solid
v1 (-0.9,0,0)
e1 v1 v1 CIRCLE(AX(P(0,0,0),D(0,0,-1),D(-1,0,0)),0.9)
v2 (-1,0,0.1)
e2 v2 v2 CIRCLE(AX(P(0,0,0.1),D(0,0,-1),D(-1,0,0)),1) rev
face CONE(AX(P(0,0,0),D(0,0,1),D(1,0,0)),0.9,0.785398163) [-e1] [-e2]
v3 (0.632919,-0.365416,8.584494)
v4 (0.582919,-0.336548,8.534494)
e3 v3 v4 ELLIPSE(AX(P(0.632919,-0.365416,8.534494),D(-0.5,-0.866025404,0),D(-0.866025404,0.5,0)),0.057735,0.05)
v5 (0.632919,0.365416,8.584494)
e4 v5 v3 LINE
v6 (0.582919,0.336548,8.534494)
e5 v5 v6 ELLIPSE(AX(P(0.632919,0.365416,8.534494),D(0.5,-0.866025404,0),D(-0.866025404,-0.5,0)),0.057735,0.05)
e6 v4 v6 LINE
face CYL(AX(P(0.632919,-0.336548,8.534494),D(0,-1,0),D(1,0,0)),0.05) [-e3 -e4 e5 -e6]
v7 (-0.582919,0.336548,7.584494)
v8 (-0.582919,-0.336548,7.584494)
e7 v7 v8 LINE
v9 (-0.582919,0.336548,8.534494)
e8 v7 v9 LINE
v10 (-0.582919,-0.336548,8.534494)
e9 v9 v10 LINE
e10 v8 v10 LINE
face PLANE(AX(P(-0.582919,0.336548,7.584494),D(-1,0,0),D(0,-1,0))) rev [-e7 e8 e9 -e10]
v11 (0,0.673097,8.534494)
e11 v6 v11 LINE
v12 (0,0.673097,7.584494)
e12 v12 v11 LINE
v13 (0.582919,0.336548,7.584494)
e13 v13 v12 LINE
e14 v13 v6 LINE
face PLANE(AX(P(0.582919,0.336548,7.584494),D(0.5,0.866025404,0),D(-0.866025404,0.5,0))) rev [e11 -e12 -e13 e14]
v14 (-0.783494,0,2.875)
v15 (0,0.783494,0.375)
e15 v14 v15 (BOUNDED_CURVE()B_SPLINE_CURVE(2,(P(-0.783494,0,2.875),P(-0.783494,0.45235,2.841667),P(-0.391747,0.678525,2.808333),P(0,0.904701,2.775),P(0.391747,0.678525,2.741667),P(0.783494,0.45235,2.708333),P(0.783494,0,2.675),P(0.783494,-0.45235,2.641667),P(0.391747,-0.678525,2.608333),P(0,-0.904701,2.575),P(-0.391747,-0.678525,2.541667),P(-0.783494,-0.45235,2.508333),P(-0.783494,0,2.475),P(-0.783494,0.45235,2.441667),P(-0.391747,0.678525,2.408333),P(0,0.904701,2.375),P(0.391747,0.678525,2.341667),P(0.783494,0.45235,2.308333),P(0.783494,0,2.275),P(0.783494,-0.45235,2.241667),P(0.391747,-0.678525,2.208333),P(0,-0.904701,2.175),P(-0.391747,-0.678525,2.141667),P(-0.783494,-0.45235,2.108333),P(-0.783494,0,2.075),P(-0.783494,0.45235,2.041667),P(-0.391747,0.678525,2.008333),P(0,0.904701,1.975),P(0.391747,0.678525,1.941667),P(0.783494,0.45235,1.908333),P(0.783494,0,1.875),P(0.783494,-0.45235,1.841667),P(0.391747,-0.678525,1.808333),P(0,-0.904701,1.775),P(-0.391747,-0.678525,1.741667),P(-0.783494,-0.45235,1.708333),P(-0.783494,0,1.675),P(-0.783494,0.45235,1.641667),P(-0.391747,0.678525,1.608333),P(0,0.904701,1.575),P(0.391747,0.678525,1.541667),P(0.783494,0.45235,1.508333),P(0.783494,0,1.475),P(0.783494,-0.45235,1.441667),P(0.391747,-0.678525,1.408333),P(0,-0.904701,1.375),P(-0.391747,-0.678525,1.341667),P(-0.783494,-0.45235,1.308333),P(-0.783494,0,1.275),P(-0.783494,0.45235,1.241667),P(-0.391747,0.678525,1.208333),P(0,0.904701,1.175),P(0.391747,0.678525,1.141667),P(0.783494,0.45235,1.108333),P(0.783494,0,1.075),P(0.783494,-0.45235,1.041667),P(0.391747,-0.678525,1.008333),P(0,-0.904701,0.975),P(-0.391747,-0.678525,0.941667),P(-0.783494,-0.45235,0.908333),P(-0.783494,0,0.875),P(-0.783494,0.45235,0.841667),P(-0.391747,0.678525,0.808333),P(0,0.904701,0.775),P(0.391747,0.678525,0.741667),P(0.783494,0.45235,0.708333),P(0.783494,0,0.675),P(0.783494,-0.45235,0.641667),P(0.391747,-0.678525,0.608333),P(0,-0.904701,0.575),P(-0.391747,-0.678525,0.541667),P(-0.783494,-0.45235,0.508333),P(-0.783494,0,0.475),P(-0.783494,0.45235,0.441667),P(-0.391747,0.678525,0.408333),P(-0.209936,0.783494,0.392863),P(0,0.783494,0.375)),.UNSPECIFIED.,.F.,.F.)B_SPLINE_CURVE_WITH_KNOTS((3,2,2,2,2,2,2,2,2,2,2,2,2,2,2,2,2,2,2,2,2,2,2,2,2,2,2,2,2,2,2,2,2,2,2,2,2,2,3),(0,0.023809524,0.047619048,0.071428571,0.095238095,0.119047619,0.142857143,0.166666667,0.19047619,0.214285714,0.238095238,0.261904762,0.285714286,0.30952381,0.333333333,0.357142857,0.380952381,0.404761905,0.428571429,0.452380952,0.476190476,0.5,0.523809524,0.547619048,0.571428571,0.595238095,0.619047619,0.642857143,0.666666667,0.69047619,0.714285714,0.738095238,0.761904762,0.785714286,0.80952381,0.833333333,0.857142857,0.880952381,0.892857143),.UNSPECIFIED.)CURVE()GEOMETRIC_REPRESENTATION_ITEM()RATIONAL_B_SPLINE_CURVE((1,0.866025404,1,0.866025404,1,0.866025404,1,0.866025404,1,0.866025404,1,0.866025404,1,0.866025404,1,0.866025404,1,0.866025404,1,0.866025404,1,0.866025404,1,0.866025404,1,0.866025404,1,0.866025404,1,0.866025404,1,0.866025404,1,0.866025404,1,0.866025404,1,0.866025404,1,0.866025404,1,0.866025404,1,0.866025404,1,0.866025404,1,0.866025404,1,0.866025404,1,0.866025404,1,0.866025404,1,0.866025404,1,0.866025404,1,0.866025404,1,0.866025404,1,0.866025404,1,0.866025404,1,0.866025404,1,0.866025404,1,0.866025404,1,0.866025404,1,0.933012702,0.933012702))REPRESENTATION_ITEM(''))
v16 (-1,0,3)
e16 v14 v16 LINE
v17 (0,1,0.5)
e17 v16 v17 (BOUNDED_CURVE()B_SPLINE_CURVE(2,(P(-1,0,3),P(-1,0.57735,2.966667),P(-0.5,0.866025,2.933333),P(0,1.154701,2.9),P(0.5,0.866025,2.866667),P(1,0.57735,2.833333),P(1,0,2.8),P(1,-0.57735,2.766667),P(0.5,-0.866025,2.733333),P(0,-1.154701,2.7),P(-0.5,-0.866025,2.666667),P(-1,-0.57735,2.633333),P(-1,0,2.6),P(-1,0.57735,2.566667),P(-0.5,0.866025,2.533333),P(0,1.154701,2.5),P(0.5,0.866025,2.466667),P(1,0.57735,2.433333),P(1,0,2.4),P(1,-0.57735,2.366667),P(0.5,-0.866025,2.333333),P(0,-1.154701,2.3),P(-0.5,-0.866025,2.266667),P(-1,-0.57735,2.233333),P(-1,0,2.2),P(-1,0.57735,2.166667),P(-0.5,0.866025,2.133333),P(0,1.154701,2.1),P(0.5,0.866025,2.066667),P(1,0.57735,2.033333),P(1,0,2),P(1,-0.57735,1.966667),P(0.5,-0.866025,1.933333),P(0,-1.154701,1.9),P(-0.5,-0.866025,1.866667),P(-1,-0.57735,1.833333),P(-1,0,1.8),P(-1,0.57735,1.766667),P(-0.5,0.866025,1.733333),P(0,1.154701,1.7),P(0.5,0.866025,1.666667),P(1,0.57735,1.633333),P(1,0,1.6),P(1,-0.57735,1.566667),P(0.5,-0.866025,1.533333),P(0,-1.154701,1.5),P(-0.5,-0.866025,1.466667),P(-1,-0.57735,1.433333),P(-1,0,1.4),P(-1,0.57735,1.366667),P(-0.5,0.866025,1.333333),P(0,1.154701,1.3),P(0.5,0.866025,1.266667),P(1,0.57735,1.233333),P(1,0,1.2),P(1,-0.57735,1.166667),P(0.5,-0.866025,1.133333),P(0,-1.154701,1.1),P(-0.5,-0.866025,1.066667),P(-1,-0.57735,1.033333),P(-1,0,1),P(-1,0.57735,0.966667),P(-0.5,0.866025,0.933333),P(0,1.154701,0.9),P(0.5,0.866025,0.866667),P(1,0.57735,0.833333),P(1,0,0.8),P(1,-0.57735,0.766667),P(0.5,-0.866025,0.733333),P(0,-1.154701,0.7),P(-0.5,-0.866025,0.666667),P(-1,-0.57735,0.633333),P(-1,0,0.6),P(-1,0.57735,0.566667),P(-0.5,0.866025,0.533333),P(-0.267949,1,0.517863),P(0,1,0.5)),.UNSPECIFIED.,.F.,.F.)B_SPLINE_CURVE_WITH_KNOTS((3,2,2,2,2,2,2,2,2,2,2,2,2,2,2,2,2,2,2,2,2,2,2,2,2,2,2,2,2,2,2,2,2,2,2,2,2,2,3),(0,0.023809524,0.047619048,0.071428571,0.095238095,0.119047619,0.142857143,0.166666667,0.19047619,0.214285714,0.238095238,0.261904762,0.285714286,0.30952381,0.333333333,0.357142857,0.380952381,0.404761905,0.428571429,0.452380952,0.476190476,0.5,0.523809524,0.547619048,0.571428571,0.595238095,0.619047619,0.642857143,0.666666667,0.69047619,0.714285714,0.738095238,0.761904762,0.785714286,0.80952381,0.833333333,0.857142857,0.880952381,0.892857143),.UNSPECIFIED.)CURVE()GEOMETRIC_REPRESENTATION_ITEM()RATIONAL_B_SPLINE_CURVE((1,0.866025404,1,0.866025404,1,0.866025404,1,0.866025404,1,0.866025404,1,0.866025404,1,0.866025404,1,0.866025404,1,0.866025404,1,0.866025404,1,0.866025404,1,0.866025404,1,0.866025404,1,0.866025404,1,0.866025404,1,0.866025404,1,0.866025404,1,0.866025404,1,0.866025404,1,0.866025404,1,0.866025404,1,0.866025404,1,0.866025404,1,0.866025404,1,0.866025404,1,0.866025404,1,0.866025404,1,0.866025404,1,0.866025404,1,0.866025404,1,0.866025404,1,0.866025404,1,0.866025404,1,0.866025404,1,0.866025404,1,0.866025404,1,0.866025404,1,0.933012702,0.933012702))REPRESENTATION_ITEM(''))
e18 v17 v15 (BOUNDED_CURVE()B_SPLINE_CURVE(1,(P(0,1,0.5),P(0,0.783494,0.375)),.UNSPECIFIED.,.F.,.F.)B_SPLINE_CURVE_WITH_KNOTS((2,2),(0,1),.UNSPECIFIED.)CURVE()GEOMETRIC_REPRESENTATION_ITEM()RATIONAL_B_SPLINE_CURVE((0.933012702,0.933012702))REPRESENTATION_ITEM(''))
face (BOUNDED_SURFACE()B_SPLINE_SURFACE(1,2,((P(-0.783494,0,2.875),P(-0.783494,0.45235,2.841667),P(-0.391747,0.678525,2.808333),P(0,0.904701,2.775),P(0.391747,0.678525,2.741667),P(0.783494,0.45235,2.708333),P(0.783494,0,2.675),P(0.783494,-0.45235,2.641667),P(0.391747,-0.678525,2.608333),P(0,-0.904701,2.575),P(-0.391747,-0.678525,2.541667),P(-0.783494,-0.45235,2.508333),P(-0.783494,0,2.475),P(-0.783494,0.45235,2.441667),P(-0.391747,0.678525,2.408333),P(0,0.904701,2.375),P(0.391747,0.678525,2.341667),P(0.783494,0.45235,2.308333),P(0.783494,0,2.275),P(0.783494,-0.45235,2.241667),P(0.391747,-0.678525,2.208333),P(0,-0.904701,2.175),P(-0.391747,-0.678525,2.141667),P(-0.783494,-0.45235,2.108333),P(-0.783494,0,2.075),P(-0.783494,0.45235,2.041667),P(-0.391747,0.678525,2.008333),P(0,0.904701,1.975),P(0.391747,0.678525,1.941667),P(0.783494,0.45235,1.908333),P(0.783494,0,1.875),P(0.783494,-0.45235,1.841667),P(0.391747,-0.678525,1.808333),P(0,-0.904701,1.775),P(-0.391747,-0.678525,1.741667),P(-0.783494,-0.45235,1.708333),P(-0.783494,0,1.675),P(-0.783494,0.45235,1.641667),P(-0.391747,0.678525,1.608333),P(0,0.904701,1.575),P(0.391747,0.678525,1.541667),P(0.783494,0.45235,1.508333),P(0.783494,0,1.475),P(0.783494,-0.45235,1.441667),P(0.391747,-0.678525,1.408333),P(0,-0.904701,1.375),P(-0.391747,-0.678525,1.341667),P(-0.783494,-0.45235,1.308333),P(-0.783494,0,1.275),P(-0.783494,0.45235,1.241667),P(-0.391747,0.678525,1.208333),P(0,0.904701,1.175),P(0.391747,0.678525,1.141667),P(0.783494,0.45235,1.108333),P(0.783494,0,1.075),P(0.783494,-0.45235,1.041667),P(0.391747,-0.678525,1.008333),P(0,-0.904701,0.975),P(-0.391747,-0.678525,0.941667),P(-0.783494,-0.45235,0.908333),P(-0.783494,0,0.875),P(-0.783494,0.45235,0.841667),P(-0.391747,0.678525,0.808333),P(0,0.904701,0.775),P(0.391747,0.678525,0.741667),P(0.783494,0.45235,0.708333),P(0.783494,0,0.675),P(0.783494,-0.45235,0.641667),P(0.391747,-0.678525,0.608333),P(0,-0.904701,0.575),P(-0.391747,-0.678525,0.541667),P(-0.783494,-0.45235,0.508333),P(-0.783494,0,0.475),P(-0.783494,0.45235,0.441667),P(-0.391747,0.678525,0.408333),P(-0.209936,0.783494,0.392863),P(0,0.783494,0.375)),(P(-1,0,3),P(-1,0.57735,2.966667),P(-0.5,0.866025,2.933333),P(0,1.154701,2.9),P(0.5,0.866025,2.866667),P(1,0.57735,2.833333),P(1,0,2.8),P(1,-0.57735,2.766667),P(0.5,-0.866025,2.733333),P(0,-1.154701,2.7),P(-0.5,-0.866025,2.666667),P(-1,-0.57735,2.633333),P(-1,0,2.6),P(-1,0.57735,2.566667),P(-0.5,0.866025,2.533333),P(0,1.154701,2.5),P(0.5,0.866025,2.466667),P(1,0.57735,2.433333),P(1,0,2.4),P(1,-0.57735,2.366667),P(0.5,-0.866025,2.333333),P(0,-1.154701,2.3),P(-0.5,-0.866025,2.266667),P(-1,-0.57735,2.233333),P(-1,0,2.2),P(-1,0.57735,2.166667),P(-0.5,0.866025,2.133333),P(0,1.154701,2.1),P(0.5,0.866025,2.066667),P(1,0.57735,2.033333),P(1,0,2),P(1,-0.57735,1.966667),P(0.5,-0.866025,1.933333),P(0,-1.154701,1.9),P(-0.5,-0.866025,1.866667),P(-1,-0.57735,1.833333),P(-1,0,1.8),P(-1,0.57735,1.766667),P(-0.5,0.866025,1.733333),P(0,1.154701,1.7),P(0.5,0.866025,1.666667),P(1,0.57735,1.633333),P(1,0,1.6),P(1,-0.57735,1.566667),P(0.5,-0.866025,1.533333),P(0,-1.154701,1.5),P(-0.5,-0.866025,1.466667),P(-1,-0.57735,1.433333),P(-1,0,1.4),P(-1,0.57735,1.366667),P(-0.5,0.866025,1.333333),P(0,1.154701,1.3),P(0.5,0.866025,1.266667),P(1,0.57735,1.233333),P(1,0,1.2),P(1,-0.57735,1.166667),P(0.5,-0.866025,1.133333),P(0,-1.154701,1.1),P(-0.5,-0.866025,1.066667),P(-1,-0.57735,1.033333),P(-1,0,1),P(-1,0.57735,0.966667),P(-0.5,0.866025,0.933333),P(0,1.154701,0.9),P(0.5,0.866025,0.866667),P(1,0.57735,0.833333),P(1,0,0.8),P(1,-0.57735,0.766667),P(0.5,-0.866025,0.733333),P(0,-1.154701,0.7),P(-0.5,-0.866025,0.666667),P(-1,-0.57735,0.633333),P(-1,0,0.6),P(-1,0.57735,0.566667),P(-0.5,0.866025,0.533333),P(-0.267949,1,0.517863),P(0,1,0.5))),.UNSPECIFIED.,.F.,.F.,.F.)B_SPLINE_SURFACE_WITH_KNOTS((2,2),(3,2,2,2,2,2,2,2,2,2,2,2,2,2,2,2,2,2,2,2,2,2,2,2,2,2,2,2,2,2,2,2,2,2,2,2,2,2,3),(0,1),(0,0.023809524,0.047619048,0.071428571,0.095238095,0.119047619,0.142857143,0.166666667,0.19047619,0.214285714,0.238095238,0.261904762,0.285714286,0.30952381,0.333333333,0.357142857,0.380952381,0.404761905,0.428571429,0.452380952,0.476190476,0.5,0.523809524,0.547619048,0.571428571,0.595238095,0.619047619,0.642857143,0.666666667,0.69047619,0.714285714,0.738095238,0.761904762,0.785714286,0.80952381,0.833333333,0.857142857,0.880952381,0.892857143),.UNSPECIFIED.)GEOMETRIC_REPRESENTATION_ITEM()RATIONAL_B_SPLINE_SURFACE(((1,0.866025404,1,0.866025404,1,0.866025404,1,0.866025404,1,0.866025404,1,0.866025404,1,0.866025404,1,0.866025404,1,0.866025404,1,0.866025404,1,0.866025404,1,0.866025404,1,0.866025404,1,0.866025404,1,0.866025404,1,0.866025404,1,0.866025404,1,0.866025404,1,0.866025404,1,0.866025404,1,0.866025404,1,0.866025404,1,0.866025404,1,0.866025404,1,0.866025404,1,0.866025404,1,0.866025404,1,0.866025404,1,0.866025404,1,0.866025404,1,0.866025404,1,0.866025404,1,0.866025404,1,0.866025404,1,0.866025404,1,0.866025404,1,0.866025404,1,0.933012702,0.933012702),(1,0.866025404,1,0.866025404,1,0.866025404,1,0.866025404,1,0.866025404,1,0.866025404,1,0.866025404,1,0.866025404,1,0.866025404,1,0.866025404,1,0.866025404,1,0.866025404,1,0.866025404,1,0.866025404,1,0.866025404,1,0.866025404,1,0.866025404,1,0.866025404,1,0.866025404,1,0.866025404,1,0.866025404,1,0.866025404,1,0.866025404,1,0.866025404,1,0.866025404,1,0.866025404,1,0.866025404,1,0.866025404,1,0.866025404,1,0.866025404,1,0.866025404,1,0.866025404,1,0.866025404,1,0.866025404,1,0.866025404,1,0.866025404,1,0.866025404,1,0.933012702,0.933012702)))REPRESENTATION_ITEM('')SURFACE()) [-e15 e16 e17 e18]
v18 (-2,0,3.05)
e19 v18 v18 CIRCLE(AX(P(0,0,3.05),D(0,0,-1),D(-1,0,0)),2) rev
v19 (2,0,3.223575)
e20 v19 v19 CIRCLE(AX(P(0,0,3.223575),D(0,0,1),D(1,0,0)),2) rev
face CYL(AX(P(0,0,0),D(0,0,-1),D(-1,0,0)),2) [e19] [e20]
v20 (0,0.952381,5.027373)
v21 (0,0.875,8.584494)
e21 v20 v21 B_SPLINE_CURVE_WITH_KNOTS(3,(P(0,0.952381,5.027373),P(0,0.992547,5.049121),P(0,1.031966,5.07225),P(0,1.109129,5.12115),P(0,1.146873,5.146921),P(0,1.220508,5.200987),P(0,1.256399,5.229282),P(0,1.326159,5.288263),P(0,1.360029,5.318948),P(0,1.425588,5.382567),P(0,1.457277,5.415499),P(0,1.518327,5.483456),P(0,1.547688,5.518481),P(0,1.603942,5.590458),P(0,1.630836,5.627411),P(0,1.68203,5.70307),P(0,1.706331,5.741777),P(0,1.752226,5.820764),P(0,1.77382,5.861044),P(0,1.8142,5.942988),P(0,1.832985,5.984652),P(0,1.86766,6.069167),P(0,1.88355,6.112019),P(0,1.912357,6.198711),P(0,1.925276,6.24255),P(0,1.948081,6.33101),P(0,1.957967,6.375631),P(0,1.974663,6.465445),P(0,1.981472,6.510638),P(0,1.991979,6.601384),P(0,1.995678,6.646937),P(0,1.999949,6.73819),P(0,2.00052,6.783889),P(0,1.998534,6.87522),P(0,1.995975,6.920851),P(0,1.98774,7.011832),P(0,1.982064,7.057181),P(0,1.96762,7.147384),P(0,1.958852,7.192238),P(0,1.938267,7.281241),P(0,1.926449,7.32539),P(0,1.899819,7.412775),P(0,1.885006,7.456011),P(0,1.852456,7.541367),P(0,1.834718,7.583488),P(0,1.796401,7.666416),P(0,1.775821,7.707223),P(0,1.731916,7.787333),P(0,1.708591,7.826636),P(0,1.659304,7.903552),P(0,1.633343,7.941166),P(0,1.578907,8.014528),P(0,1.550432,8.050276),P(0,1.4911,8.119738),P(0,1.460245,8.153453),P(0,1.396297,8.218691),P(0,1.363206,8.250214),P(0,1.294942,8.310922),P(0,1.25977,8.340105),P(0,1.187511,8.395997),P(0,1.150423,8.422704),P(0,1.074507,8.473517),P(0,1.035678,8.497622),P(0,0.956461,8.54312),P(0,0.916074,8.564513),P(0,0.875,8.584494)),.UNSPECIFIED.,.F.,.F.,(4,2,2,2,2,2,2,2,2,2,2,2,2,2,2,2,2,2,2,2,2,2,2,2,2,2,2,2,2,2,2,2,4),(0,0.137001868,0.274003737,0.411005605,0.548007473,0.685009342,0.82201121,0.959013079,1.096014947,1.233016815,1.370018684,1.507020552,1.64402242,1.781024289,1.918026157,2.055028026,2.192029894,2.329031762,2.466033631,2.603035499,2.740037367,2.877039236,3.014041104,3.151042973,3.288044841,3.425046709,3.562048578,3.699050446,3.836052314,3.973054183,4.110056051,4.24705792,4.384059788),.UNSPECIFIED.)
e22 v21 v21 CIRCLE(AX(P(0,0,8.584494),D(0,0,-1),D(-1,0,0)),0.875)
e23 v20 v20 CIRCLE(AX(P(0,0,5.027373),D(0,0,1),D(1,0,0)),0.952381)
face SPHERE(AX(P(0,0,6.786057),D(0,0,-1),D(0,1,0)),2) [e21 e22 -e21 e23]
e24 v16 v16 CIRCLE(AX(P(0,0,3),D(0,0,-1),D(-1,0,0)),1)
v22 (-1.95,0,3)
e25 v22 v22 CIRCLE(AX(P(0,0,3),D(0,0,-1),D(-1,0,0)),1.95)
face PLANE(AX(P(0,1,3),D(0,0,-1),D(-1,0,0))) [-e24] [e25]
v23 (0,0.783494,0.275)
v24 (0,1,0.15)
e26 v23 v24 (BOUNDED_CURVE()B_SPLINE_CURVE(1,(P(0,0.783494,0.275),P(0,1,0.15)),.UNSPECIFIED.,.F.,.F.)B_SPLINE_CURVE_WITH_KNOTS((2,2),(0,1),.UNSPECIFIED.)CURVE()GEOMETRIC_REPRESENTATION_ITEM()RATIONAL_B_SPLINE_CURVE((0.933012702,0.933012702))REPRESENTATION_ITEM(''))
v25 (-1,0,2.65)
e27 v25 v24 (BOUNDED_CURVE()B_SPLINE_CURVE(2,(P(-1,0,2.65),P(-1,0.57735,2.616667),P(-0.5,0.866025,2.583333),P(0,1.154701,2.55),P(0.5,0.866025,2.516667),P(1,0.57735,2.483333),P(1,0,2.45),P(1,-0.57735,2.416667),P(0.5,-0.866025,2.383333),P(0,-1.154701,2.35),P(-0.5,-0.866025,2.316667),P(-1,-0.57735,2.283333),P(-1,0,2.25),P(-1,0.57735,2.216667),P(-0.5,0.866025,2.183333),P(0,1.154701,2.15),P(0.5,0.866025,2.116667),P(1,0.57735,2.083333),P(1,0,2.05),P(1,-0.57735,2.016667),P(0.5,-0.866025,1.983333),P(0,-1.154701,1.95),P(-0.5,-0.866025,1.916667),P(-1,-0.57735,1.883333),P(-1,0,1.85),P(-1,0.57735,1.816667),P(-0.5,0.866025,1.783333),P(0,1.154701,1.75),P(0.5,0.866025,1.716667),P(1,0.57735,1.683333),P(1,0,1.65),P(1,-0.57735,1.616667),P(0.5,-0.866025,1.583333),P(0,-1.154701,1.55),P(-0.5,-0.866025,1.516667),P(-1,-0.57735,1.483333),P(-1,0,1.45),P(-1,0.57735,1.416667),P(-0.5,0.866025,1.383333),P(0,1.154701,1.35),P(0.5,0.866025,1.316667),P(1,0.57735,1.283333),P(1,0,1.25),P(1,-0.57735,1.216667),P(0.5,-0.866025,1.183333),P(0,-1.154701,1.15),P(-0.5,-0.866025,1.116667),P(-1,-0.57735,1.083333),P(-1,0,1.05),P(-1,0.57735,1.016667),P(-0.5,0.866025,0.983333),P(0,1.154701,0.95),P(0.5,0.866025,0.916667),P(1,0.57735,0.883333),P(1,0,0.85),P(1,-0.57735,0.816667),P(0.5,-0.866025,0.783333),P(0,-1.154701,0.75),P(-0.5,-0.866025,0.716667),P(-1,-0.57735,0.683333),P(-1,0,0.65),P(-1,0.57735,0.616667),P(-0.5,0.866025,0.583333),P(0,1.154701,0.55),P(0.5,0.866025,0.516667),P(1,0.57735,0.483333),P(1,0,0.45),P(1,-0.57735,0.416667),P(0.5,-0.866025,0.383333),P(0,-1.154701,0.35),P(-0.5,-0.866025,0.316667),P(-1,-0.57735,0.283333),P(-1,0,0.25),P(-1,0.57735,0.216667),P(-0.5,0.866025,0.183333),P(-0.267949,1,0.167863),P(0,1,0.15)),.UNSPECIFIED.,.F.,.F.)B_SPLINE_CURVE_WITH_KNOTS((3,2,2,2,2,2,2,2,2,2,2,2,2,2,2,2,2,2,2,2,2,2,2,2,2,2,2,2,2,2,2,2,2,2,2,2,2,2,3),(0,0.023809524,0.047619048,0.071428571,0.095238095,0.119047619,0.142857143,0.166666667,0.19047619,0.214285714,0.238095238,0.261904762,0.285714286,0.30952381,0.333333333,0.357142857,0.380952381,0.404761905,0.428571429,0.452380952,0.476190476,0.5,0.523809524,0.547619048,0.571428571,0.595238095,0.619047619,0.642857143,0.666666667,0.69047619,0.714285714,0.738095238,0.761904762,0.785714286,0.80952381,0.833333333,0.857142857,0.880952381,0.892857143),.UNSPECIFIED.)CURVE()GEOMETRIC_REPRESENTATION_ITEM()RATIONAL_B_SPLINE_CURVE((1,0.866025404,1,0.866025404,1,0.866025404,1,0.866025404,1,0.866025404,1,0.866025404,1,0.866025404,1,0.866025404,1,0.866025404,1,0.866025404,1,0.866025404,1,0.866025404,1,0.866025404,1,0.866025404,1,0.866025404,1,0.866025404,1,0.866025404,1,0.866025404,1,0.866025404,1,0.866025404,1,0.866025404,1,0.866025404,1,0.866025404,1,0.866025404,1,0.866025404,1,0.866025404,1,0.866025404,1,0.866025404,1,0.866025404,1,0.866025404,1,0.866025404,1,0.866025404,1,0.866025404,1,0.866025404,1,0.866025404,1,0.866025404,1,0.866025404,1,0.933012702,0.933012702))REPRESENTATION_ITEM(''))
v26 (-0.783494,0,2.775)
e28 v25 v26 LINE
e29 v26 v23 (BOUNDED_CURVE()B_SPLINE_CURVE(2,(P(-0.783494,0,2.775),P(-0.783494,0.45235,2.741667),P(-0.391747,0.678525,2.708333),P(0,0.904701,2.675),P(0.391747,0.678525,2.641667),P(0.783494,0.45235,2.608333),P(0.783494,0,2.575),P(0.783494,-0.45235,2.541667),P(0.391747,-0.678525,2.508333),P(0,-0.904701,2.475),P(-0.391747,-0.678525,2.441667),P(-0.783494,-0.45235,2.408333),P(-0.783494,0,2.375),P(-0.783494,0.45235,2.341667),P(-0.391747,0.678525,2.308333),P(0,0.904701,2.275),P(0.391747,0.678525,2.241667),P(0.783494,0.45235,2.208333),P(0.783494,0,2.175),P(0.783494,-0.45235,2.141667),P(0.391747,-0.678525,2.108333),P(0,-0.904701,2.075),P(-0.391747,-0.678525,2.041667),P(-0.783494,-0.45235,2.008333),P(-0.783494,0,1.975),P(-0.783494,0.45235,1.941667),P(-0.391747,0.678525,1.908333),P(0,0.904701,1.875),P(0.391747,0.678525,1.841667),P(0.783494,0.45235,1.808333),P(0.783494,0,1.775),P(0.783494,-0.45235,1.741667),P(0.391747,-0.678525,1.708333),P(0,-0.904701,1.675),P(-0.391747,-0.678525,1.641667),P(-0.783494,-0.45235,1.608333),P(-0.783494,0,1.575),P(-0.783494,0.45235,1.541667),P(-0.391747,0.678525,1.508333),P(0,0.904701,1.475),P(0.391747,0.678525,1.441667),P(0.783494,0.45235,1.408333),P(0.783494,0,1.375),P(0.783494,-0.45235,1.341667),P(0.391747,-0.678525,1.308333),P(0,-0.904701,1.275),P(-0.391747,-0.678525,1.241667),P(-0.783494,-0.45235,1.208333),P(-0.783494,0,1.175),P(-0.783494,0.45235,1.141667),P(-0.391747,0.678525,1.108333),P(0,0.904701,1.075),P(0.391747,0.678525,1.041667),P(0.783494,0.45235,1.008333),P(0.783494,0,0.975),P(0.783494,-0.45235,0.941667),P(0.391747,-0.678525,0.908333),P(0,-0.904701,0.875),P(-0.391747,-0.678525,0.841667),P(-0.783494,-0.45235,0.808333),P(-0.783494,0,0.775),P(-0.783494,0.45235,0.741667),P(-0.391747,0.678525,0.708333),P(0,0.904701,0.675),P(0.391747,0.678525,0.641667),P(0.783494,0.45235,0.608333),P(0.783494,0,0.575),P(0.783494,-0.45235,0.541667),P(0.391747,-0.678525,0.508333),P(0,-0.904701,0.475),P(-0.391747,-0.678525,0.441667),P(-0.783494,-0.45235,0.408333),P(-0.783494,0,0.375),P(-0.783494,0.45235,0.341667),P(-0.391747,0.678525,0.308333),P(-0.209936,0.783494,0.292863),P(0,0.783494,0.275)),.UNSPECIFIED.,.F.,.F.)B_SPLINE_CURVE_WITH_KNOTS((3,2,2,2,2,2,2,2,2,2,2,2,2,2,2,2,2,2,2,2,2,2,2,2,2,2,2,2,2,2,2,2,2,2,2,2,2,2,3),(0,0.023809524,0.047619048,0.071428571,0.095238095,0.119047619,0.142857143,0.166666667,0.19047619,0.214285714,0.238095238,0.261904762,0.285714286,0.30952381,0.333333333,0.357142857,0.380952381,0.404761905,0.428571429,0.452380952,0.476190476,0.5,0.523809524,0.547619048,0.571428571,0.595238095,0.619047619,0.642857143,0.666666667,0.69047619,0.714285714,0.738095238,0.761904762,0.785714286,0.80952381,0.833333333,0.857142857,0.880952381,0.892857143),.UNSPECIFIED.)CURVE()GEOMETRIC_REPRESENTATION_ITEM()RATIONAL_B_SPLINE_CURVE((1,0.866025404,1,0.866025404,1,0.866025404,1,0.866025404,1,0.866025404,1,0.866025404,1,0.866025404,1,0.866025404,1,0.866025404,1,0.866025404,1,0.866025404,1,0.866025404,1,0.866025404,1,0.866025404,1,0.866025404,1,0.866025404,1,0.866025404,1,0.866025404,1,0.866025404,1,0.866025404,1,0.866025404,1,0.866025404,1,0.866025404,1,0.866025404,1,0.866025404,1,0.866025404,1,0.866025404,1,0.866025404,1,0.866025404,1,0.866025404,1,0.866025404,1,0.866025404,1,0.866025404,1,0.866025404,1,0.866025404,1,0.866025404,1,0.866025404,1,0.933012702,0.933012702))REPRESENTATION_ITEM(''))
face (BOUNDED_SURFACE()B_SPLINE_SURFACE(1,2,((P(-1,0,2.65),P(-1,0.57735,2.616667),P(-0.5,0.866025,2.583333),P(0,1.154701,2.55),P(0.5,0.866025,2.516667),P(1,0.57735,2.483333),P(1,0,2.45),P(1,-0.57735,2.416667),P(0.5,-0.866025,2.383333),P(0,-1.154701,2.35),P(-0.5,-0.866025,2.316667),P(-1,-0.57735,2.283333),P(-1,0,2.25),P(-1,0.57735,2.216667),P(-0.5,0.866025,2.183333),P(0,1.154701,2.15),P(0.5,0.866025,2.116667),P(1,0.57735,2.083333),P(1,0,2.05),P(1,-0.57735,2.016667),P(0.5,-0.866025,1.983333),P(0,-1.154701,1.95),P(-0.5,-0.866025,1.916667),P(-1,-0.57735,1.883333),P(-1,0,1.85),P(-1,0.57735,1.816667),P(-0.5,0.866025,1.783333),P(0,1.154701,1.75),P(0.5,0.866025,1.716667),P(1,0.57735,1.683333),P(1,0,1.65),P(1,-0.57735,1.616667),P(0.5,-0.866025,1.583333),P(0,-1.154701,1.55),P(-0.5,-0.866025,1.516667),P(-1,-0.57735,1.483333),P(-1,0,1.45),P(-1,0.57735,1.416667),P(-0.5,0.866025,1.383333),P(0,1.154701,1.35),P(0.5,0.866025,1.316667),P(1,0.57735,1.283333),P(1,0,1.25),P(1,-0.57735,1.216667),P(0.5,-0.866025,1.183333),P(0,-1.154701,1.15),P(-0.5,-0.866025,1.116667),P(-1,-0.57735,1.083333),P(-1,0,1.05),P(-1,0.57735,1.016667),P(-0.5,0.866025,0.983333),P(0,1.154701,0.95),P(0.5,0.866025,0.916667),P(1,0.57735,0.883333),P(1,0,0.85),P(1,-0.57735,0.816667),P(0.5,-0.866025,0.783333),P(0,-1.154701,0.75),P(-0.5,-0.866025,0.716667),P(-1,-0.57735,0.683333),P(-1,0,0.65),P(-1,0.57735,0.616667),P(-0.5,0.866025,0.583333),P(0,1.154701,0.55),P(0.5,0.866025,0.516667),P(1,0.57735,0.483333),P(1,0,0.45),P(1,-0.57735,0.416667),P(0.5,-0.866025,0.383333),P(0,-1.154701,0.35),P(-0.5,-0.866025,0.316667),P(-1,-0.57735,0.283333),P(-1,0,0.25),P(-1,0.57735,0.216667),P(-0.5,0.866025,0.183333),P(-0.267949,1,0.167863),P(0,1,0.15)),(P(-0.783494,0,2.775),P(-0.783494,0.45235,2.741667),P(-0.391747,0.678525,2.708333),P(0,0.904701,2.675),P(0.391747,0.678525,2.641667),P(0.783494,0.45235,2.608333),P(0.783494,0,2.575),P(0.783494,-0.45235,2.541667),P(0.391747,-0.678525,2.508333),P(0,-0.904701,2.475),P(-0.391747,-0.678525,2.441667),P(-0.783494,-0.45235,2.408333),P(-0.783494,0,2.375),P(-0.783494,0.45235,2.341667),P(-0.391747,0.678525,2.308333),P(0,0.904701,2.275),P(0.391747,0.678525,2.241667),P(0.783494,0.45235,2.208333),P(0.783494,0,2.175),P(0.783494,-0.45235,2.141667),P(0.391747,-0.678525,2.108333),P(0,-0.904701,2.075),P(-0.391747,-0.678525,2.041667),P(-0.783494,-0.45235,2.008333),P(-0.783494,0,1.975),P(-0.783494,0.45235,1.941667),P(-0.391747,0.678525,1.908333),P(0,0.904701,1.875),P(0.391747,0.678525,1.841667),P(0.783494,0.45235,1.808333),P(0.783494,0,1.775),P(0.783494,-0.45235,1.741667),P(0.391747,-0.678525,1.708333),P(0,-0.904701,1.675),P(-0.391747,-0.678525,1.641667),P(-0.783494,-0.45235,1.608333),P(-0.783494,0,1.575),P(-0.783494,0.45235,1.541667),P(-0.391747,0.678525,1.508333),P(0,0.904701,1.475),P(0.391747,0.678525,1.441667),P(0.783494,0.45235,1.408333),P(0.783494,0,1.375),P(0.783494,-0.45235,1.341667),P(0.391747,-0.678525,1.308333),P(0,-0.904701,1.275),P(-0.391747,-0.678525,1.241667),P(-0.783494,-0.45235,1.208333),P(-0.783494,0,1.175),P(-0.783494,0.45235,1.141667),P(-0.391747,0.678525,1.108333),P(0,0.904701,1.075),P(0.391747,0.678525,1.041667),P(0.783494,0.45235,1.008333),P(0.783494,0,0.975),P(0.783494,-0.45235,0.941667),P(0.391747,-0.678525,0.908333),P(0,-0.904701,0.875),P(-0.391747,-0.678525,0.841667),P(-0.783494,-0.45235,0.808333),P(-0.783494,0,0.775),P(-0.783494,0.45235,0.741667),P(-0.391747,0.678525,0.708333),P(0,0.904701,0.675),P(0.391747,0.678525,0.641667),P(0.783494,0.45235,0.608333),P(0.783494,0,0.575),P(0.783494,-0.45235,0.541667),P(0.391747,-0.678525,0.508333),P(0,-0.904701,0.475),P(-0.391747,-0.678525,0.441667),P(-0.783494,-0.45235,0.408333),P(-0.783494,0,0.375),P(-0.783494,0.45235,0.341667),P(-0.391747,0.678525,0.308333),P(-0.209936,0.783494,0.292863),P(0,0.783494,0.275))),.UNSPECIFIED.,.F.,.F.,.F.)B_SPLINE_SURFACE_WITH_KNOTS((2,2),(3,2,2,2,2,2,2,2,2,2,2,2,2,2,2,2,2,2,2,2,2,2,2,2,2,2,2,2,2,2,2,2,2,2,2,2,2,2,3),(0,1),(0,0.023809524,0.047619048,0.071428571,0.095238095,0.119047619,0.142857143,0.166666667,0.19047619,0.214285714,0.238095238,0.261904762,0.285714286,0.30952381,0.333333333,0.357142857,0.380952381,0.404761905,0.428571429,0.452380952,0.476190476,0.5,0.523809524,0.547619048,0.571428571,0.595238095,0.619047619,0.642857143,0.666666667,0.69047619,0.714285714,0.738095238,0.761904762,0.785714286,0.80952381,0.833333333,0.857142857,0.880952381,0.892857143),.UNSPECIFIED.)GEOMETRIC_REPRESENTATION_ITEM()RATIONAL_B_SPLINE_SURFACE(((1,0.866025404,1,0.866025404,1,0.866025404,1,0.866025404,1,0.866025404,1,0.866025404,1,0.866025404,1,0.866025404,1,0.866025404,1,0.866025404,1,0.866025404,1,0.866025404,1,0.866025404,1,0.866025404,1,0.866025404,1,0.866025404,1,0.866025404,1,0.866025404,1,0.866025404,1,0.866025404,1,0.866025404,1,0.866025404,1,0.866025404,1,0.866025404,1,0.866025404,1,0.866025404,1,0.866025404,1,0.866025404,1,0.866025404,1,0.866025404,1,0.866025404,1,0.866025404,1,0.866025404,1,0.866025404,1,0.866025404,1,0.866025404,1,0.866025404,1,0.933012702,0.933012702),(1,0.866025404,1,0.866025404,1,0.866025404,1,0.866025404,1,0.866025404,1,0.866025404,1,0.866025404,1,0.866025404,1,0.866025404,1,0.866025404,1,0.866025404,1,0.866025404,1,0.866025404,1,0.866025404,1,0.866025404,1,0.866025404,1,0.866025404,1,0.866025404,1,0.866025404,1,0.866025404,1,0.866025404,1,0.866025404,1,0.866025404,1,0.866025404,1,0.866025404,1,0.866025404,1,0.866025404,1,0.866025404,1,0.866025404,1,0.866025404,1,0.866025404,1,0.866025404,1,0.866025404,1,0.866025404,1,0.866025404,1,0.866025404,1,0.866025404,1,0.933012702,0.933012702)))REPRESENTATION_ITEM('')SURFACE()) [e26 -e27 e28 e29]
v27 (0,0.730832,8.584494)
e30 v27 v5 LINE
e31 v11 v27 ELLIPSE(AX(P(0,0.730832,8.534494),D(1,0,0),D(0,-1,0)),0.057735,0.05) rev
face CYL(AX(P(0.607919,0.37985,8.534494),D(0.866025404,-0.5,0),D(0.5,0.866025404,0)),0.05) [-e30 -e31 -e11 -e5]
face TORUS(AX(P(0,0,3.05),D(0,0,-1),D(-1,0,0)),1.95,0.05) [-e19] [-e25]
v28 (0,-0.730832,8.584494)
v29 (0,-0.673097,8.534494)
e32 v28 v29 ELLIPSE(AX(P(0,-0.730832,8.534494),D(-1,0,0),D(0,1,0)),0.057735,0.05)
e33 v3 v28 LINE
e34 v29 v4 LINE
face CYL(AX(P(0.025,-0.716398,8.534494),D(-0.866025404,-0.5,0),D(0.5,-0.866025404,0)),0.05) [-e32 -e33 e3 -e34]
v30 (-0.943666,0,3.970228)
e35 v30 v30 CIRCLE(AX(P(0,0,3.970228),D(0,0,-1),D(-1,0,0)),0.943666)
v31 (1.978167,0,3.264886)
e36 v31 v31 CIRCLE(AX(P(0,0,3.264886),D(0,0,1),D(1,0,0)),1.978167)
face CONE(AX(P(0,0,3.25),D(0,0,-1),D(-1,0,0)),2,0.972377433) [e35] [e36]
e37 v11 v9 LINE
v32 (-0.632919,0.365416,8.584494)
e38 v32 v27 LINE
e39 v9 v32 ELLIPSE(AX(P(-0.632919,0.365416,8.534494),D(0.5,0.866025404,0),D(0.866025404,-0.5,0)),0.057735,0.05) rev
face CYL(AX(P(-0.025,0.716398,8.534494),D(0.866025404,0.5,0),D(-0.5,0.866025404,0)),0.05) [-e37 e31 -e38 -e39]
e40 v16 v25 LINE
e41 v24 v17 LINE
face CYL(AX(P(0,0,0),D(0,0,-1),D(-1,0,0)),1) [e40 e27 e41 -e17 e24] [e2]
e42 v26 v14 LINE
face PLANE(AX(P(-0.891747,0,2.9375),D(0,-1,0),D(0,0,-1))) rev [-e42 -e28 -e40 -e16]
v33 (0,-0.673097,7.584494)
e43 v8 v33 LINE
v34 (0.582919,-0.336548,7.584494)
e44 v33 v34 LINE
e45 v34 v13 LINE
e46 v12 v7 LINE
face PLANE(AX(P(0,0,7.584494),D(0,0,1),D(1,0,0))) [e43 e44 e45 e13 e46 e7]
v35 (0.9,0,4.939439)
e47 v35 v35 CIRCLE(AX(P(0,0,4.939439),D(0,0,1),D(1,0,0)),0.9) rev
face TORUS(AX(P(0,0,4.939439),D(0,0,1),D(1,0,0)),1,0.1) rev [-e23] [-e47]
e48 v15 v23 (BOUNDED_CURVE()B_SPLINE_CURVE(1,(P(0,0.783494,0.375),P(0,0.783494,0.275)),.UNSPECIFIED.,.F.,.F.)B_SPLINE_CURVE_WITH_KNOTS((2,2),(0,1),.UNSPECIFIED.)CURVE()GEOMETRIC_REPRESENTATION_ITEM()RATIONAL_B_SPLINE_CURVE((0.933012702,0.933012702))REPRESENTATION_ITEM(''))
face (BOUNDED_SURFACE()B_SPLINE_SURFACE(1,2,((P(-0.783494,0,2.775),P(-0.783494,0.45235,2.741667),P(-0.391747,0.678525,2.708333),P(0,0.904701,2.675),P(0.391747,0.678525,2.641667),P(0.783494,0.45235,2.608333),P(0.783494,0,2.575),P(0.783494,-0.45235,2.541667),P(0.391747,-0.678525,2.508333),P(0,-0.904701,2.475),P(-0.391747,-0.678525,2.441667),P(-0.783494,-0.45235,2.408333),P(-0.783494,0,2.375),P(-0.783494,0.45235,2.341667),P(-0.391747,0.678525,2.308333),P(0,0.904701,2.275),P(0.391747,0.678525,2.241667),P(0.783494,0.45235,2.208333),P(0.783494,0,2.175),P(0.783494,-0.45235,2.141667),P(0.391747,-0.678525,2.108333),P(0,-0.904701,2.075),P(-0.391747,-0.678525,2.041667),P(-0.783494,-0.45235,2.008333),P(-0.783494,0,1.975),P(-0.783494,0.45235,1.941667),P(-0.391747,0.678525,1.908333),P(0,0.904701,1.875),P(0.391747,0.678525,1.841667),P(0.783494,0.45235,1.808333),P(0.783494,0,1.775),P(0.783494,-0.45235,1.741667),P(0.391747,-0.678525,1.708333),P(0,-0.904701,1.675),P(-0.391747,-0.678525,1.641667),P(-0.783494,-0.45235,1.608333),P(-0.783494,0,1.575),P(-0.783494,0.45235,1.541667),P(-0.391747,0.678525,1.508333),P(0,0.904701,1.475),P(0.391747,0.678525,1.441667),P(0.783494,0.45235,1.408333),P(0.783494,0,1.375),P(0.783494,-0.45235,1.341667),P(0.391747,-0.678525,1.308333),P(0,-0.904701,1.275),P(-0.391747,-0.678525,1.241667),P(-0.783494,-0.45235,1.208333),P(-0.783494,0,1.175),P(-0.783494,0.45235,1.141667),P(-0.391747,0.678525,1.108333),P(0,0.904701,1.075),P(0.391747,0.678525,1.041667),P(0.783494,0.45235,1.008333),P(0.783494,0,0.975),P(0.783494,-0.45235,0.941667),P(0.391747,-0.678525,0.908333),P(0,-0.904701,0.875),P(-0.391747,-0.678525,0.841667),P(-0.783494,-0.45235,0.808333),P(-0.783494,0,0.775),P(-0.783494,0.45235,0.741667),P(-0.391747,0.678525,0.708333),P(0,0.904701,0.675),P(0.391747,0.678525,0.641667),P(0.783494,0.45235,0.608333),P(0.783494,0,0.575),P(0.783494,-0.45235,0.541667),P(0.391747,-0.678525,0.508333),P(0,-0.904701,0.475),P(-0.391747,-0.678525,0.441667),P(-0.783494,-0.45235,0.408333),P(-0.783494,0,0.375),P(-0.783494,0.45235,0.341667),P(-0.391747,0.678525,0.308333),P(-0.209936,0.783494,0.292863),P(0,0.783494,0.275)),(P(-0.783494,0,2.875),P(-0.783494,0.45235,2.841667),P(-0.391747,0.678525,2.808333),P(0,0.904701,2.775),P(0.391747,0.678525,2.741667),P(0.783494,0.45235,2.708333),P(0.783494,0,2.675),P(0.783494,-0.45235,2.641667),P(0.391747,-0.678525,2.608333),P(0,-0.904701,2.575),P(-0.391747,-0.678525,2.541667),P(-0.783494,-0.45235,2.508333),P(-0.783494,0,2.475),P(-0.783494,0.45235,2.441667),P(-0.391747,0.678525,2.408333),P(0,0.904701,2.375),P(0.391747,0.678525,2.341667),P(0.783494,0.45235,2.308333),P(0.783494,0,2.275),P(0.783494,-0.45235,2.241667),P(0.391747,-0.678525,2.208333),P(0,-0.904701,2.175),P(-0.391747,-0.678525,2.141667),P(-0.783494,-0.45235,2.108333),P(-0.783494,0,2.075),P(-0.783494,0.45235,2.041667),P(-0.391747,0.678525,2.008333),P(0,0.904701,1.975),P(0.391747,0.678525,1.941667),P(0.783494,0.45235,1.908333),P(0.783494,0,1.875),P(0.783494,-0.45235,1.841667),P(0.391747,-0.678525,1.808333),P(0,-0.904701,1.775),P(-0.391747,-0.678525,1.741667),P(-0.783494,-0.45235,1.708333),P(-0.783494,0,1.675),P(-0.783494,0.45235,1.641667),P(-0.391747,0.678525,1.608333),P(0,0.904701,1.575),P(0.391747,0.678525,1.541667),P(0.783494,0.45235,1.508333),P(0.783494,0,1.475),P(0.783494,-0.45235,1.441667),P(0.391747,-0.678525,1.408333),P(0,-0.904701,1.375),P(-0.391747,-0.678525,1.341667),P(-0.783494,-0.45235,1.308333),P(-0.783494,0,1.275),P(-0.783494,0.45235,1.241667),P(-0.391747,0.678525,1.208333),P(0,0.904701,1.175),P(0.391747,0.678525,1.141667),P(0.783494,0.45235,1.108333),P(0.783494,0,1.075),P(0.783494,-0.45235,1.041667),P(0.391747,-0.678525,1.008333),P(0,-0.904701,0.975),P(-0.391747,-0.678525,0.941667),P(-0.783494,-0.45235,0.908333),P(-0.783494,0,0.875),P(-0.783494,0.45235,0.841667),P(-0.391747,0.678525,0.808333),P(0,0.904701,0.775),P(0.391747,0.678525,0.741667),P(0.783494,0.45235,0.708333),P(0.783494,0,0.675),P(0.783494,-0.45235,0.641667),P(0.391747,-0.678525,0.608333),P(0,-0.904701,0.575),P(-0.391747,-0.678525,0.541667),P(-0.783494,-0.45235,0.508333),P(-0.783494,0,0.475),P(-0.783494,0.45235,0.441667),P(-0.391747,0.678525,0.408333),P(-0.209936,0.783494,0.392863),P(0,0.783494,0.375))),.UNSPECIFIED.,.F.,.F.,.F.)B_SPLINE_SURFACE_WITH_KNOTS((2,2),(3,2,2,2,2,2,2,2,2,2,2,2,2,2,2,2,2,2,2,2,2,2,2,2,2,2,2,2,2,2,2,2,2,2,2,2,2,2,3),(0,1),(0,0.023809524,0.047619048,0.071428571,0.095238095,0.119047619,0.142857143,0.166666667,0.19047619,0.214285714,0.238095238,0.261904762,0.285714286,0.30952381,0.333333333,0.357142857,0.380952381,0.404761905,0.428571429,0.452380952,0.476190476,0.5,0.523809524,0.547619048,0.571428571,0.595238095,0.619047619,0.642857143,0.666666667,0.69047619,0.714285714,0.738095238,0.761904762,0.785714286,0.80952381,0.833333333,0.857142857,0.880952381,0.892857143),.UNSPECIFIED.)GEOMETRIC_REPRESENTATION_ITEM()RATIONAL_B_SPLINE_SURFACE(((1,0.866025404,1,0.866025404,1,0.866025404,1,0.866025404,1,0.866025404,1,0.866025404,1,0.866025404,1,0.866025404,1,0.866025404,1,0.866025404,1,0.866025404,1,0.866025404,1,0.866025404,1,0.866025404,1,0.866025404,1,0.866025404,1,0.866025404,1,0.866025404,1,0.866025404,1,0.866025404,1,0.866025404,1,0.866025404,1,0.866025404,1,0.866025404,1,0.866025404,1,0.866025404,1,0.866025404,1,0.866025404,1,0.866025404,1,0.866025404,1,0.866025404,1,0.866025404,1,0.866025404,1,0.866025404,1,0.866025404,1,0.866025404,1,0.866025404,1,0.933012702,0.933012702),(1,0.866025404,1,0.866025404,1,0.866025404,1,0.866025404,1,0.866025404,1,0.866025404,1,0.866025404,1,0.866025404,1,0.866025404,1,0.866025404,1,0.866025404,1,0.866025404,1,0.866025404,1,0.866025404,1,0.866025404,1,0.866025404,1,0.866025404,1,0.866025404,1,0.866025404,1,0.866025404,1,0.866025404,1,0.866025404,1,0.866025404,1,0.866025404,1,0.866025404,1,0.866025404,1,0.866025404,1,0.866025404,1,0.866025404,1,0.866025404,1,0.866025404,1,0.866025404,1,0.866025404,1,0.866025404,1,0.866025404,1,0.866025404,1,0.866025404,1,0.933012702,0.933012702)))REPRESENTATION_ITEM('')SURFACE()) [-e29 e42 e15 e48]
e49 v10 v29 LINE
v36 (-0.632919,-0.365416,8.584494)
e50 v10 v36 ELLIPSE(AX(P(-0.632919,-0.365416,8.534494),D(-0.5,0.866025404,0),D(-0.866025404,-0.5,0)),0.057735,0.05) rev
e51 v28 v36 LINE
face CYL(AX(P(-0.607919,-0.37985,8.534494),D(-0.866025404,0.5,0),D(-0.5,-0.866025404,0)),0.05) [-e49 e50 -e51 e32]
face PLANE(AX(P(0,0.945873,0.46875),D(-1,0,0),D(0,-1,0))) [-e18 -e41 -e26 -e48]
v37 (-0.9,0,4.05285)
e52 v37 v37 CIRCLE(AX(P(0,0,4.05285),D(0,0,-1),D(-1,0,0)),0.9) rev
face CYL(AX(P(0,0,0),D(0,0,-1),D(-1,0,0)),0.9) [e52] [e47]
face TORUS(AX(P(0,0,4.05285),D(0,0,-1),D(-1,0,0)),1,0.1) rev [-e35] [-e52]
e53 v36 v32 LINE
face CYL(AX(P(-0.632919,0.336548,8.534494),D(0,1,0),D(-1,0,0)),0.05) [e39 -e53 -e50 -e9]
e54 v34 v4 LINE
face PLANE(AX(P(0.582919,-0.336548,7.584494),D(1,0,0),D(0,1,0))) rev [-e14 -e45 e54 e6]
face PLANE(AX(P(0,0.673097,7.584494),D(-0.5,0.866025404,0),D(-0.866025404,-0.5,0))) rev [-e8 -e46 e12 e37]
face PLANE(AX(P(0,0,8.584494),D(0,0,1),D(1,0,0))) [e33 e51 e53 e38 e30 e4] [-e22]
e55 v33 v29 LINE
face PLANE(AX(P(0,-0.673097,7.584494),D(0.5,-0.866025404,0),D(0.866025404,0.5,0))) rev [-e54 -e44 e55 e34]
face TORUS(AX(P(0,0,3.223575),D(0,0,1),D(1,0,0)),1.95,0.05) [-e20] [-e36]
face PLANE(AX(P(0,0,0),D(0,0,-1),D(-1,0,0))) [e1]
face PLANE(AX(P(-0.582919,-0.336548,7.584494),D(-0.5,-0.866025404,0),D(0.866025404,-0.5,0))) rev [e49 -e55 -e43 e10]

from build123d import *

# Parameters (mm, degrees)
CHAMFER1_SIZE      = 0.1
THREAD1_PITCH      = 0.4
FILLET1_R          = 0.05
FILLET2_R          = 0.1
CUT_EXTRUDE1_DEPTH = 1
FILLET3_R          = 0.05


with BuildPart() as part:
    # Sketch2 → Revolve1 (revolve)
    with BuildSketch(Plane(origin=(0, 0, 0), x_dir=(0, 0, -1), z_dir=(1, 0, 0)), mode=Mode.PRIVATE) as revolve1_sk:
        with BuildLine():
            Line((0, 0), (0, 1))
            Line((0, 1), (-3, 1))
            Line((-3, 1), (-3, 2))
            Line((-3, 2), (-3.25, 2))
            Line((-3.25, 2), (-4, 0.9))
            Line((-4, 0.9), (-5, 0.9))
            ThreePointArc((-5, 0.9), (-6.800005741, 1.999951358), (-8.584493931, 0.875))
            Line((-8.584493931, 0.875), (-8.584493931, 0))
            Line((-8.584493931, 0), (0, 0))
        make_face()
    revolve(revolve1_sk.sketch.rotate(Axis((0, 0, 0), (0, 0, 1)), 90), axis=Axis((0, 0, 0), (0, 0, 1)))

    # Chamfer1
    chamfer1_edges = [part.edges().sort_by_distance(p)[0] for p in [
        (1, 0, 0),
    ]]
    chamfer(chamfer1_edges, length=CHAMFER1_SIZE)

    # Thread1: the profile of Thread Profile1 profile screwed along a right-hand helix of 6.25 turns, 6 arcs to a turn; built about Z, then put on its axis
    thread1_z = Axis((0, 0, 0), (0, 0, 1))
    thread1_corners = [(1.0003, 0, -0.000173205), (1.0003, 0, 0.350173204), (0.78349365, 0, 0.224999999), (0.78349365, 0, 0.124999999)]
    with BuildLine(mode=Mode.PRIVATE) as thread1_profile:
        Line(thread1_corners[0], thread1_corners[1])
        Line(thread1_corners[1], thread1_corners[2])
        Line(thread1_corners[2], thread1_corners[3])
        Line(thread1_corners[3], thread1_corners[0])
    thread1_cap = Face(thread1_profile.wire())
    thread1_turn_angles = [0, 30, 60, 90, 120, 150, 180, 210, 240, 270, 300, 330, 360]
    thread1_turn_weights = [1, 0.8660254037844387, 1, 0.8660254037844387, 1, 0.8660254037844387, 1, 0.8660254037844387, 1, 0.8660254037844387, 1, 0.8660254037844387, 1]
    thread1_turn_rails = [Edge.make_bspline([Vector(p[0], p[1], 0).rotate(thread1_z, thread1_turn_angles[k]) / thread1_turn_weights[k] + Vector(0, 0, p[2] + THREAD1_PITCH * thread1_turn_angles[k] / 360) for k in range(13)], [0, 0, 0, 1, 1, 2, 2, 3, 3, 4, 4, 5, 5, 6, 6, 6], 2, thread1_turn_weights) for p in thread1_corners]
    thread1_turn_sides = [Face.make_surface_from_curves(thread1_turn_rails[p[0]], thread1_turn_rails[p[1]]) for p in [(0, 1), (1, 2), (2, 3), (3, 0)]]
    thread1_last_angles = [2160, 2190, 2220, 2235, 2250]
    thread1_last_weights = [1, 0.8660254037844387, 1, 0.9659258262890683, 1]
    thread1_last_rails = [Edge.make_bspline([Vector(p[0], p[1], 0).rotate(thread1_z, thread1_last_angles[k]) / thread1_last_weights[k] + Vector(0, 0, p[2] + THREAD1_PITCH * thread1_last_angles[k] / 360) for k in range(5)], [0, 0, 0, 1, 1, 2, 2, 2], 2, thread1_last_weights) for p in thread1_corners]
    thread1_last_sides = [Face.make_surface_from_curves(thread1_last_rails[p[0]], thread1_last_rails[p[1]]) for p in [(0, 1), (1, 2), (2, 3), (3, 0)]]
    thread1 = Plane(origin=(0, 0, 3), x_dir=(-1, 0, 0), z_dir=(0, 0, -1)) * Solid(Shell([*[p.moved(Location((0, 0, THREAD1_PITCH * i))) for i in range(6) for p in thread1_turn_sides], *thread1_last_sides, thread1_cap, thread1_cap.rotate(thread1_z, 2250).moved(Location((0, 0, THREAD1_PITCH * 2250 / 360)))]))
    add(thread1, mode=Mode.SUBTRACT)

    # Fillet1
    fillet1_edges = [part.edges().sort_by_distance(p)[0] for p in [
        (2, 0, 3.25),
        (2, 0, 3),
    ]]
    fillet(fillet1_edges, radius=FILLET1_R)

    # Fillet2
    fillet2_edges = [part.edges().sort_by_distance(p)[0] for p in [
        (0.9, 0, 5),
        (0.9, 0, 4),
    ]]
    fillet(fillet2_edges, radius=FILLET2_R)

    # Sketch8 → Cut-Extrude1 (cut)
    with BuildSketch(Plane.XY.offset(8.584493931)):
        Polygon((0.582918981, -0.336548431), (0.582918981, 0.336548431), (0, 0.673096862), (-0.582918981, 0.336548431), (-0.582918981, -0.336548431), (0, -0.673096862), align=None)
    extrude(amount=-CUT_EXTRUDE1_DEPTH, mode=Mode.SUBTRACT)

    # Fillet3
    fillet3_edges = [part.edges().sort_by_distance(p)[0] for p in [
        (0.291459491, -0.504822646, 8.584493931),
        (0.582918981, 0, 8.584493931),
        (0.291459491, 0.504822646, 8.584493931),
        (-0.291459491, 0.504822646, 8.584493931),
        (-0.582918981, 0, 8.584493931),
        (-0.291459491, -0.504822646, 8.584493931),
    ]]
    fillet(fillet3_edges, radius=FILLET3_R)


solid = part.part
